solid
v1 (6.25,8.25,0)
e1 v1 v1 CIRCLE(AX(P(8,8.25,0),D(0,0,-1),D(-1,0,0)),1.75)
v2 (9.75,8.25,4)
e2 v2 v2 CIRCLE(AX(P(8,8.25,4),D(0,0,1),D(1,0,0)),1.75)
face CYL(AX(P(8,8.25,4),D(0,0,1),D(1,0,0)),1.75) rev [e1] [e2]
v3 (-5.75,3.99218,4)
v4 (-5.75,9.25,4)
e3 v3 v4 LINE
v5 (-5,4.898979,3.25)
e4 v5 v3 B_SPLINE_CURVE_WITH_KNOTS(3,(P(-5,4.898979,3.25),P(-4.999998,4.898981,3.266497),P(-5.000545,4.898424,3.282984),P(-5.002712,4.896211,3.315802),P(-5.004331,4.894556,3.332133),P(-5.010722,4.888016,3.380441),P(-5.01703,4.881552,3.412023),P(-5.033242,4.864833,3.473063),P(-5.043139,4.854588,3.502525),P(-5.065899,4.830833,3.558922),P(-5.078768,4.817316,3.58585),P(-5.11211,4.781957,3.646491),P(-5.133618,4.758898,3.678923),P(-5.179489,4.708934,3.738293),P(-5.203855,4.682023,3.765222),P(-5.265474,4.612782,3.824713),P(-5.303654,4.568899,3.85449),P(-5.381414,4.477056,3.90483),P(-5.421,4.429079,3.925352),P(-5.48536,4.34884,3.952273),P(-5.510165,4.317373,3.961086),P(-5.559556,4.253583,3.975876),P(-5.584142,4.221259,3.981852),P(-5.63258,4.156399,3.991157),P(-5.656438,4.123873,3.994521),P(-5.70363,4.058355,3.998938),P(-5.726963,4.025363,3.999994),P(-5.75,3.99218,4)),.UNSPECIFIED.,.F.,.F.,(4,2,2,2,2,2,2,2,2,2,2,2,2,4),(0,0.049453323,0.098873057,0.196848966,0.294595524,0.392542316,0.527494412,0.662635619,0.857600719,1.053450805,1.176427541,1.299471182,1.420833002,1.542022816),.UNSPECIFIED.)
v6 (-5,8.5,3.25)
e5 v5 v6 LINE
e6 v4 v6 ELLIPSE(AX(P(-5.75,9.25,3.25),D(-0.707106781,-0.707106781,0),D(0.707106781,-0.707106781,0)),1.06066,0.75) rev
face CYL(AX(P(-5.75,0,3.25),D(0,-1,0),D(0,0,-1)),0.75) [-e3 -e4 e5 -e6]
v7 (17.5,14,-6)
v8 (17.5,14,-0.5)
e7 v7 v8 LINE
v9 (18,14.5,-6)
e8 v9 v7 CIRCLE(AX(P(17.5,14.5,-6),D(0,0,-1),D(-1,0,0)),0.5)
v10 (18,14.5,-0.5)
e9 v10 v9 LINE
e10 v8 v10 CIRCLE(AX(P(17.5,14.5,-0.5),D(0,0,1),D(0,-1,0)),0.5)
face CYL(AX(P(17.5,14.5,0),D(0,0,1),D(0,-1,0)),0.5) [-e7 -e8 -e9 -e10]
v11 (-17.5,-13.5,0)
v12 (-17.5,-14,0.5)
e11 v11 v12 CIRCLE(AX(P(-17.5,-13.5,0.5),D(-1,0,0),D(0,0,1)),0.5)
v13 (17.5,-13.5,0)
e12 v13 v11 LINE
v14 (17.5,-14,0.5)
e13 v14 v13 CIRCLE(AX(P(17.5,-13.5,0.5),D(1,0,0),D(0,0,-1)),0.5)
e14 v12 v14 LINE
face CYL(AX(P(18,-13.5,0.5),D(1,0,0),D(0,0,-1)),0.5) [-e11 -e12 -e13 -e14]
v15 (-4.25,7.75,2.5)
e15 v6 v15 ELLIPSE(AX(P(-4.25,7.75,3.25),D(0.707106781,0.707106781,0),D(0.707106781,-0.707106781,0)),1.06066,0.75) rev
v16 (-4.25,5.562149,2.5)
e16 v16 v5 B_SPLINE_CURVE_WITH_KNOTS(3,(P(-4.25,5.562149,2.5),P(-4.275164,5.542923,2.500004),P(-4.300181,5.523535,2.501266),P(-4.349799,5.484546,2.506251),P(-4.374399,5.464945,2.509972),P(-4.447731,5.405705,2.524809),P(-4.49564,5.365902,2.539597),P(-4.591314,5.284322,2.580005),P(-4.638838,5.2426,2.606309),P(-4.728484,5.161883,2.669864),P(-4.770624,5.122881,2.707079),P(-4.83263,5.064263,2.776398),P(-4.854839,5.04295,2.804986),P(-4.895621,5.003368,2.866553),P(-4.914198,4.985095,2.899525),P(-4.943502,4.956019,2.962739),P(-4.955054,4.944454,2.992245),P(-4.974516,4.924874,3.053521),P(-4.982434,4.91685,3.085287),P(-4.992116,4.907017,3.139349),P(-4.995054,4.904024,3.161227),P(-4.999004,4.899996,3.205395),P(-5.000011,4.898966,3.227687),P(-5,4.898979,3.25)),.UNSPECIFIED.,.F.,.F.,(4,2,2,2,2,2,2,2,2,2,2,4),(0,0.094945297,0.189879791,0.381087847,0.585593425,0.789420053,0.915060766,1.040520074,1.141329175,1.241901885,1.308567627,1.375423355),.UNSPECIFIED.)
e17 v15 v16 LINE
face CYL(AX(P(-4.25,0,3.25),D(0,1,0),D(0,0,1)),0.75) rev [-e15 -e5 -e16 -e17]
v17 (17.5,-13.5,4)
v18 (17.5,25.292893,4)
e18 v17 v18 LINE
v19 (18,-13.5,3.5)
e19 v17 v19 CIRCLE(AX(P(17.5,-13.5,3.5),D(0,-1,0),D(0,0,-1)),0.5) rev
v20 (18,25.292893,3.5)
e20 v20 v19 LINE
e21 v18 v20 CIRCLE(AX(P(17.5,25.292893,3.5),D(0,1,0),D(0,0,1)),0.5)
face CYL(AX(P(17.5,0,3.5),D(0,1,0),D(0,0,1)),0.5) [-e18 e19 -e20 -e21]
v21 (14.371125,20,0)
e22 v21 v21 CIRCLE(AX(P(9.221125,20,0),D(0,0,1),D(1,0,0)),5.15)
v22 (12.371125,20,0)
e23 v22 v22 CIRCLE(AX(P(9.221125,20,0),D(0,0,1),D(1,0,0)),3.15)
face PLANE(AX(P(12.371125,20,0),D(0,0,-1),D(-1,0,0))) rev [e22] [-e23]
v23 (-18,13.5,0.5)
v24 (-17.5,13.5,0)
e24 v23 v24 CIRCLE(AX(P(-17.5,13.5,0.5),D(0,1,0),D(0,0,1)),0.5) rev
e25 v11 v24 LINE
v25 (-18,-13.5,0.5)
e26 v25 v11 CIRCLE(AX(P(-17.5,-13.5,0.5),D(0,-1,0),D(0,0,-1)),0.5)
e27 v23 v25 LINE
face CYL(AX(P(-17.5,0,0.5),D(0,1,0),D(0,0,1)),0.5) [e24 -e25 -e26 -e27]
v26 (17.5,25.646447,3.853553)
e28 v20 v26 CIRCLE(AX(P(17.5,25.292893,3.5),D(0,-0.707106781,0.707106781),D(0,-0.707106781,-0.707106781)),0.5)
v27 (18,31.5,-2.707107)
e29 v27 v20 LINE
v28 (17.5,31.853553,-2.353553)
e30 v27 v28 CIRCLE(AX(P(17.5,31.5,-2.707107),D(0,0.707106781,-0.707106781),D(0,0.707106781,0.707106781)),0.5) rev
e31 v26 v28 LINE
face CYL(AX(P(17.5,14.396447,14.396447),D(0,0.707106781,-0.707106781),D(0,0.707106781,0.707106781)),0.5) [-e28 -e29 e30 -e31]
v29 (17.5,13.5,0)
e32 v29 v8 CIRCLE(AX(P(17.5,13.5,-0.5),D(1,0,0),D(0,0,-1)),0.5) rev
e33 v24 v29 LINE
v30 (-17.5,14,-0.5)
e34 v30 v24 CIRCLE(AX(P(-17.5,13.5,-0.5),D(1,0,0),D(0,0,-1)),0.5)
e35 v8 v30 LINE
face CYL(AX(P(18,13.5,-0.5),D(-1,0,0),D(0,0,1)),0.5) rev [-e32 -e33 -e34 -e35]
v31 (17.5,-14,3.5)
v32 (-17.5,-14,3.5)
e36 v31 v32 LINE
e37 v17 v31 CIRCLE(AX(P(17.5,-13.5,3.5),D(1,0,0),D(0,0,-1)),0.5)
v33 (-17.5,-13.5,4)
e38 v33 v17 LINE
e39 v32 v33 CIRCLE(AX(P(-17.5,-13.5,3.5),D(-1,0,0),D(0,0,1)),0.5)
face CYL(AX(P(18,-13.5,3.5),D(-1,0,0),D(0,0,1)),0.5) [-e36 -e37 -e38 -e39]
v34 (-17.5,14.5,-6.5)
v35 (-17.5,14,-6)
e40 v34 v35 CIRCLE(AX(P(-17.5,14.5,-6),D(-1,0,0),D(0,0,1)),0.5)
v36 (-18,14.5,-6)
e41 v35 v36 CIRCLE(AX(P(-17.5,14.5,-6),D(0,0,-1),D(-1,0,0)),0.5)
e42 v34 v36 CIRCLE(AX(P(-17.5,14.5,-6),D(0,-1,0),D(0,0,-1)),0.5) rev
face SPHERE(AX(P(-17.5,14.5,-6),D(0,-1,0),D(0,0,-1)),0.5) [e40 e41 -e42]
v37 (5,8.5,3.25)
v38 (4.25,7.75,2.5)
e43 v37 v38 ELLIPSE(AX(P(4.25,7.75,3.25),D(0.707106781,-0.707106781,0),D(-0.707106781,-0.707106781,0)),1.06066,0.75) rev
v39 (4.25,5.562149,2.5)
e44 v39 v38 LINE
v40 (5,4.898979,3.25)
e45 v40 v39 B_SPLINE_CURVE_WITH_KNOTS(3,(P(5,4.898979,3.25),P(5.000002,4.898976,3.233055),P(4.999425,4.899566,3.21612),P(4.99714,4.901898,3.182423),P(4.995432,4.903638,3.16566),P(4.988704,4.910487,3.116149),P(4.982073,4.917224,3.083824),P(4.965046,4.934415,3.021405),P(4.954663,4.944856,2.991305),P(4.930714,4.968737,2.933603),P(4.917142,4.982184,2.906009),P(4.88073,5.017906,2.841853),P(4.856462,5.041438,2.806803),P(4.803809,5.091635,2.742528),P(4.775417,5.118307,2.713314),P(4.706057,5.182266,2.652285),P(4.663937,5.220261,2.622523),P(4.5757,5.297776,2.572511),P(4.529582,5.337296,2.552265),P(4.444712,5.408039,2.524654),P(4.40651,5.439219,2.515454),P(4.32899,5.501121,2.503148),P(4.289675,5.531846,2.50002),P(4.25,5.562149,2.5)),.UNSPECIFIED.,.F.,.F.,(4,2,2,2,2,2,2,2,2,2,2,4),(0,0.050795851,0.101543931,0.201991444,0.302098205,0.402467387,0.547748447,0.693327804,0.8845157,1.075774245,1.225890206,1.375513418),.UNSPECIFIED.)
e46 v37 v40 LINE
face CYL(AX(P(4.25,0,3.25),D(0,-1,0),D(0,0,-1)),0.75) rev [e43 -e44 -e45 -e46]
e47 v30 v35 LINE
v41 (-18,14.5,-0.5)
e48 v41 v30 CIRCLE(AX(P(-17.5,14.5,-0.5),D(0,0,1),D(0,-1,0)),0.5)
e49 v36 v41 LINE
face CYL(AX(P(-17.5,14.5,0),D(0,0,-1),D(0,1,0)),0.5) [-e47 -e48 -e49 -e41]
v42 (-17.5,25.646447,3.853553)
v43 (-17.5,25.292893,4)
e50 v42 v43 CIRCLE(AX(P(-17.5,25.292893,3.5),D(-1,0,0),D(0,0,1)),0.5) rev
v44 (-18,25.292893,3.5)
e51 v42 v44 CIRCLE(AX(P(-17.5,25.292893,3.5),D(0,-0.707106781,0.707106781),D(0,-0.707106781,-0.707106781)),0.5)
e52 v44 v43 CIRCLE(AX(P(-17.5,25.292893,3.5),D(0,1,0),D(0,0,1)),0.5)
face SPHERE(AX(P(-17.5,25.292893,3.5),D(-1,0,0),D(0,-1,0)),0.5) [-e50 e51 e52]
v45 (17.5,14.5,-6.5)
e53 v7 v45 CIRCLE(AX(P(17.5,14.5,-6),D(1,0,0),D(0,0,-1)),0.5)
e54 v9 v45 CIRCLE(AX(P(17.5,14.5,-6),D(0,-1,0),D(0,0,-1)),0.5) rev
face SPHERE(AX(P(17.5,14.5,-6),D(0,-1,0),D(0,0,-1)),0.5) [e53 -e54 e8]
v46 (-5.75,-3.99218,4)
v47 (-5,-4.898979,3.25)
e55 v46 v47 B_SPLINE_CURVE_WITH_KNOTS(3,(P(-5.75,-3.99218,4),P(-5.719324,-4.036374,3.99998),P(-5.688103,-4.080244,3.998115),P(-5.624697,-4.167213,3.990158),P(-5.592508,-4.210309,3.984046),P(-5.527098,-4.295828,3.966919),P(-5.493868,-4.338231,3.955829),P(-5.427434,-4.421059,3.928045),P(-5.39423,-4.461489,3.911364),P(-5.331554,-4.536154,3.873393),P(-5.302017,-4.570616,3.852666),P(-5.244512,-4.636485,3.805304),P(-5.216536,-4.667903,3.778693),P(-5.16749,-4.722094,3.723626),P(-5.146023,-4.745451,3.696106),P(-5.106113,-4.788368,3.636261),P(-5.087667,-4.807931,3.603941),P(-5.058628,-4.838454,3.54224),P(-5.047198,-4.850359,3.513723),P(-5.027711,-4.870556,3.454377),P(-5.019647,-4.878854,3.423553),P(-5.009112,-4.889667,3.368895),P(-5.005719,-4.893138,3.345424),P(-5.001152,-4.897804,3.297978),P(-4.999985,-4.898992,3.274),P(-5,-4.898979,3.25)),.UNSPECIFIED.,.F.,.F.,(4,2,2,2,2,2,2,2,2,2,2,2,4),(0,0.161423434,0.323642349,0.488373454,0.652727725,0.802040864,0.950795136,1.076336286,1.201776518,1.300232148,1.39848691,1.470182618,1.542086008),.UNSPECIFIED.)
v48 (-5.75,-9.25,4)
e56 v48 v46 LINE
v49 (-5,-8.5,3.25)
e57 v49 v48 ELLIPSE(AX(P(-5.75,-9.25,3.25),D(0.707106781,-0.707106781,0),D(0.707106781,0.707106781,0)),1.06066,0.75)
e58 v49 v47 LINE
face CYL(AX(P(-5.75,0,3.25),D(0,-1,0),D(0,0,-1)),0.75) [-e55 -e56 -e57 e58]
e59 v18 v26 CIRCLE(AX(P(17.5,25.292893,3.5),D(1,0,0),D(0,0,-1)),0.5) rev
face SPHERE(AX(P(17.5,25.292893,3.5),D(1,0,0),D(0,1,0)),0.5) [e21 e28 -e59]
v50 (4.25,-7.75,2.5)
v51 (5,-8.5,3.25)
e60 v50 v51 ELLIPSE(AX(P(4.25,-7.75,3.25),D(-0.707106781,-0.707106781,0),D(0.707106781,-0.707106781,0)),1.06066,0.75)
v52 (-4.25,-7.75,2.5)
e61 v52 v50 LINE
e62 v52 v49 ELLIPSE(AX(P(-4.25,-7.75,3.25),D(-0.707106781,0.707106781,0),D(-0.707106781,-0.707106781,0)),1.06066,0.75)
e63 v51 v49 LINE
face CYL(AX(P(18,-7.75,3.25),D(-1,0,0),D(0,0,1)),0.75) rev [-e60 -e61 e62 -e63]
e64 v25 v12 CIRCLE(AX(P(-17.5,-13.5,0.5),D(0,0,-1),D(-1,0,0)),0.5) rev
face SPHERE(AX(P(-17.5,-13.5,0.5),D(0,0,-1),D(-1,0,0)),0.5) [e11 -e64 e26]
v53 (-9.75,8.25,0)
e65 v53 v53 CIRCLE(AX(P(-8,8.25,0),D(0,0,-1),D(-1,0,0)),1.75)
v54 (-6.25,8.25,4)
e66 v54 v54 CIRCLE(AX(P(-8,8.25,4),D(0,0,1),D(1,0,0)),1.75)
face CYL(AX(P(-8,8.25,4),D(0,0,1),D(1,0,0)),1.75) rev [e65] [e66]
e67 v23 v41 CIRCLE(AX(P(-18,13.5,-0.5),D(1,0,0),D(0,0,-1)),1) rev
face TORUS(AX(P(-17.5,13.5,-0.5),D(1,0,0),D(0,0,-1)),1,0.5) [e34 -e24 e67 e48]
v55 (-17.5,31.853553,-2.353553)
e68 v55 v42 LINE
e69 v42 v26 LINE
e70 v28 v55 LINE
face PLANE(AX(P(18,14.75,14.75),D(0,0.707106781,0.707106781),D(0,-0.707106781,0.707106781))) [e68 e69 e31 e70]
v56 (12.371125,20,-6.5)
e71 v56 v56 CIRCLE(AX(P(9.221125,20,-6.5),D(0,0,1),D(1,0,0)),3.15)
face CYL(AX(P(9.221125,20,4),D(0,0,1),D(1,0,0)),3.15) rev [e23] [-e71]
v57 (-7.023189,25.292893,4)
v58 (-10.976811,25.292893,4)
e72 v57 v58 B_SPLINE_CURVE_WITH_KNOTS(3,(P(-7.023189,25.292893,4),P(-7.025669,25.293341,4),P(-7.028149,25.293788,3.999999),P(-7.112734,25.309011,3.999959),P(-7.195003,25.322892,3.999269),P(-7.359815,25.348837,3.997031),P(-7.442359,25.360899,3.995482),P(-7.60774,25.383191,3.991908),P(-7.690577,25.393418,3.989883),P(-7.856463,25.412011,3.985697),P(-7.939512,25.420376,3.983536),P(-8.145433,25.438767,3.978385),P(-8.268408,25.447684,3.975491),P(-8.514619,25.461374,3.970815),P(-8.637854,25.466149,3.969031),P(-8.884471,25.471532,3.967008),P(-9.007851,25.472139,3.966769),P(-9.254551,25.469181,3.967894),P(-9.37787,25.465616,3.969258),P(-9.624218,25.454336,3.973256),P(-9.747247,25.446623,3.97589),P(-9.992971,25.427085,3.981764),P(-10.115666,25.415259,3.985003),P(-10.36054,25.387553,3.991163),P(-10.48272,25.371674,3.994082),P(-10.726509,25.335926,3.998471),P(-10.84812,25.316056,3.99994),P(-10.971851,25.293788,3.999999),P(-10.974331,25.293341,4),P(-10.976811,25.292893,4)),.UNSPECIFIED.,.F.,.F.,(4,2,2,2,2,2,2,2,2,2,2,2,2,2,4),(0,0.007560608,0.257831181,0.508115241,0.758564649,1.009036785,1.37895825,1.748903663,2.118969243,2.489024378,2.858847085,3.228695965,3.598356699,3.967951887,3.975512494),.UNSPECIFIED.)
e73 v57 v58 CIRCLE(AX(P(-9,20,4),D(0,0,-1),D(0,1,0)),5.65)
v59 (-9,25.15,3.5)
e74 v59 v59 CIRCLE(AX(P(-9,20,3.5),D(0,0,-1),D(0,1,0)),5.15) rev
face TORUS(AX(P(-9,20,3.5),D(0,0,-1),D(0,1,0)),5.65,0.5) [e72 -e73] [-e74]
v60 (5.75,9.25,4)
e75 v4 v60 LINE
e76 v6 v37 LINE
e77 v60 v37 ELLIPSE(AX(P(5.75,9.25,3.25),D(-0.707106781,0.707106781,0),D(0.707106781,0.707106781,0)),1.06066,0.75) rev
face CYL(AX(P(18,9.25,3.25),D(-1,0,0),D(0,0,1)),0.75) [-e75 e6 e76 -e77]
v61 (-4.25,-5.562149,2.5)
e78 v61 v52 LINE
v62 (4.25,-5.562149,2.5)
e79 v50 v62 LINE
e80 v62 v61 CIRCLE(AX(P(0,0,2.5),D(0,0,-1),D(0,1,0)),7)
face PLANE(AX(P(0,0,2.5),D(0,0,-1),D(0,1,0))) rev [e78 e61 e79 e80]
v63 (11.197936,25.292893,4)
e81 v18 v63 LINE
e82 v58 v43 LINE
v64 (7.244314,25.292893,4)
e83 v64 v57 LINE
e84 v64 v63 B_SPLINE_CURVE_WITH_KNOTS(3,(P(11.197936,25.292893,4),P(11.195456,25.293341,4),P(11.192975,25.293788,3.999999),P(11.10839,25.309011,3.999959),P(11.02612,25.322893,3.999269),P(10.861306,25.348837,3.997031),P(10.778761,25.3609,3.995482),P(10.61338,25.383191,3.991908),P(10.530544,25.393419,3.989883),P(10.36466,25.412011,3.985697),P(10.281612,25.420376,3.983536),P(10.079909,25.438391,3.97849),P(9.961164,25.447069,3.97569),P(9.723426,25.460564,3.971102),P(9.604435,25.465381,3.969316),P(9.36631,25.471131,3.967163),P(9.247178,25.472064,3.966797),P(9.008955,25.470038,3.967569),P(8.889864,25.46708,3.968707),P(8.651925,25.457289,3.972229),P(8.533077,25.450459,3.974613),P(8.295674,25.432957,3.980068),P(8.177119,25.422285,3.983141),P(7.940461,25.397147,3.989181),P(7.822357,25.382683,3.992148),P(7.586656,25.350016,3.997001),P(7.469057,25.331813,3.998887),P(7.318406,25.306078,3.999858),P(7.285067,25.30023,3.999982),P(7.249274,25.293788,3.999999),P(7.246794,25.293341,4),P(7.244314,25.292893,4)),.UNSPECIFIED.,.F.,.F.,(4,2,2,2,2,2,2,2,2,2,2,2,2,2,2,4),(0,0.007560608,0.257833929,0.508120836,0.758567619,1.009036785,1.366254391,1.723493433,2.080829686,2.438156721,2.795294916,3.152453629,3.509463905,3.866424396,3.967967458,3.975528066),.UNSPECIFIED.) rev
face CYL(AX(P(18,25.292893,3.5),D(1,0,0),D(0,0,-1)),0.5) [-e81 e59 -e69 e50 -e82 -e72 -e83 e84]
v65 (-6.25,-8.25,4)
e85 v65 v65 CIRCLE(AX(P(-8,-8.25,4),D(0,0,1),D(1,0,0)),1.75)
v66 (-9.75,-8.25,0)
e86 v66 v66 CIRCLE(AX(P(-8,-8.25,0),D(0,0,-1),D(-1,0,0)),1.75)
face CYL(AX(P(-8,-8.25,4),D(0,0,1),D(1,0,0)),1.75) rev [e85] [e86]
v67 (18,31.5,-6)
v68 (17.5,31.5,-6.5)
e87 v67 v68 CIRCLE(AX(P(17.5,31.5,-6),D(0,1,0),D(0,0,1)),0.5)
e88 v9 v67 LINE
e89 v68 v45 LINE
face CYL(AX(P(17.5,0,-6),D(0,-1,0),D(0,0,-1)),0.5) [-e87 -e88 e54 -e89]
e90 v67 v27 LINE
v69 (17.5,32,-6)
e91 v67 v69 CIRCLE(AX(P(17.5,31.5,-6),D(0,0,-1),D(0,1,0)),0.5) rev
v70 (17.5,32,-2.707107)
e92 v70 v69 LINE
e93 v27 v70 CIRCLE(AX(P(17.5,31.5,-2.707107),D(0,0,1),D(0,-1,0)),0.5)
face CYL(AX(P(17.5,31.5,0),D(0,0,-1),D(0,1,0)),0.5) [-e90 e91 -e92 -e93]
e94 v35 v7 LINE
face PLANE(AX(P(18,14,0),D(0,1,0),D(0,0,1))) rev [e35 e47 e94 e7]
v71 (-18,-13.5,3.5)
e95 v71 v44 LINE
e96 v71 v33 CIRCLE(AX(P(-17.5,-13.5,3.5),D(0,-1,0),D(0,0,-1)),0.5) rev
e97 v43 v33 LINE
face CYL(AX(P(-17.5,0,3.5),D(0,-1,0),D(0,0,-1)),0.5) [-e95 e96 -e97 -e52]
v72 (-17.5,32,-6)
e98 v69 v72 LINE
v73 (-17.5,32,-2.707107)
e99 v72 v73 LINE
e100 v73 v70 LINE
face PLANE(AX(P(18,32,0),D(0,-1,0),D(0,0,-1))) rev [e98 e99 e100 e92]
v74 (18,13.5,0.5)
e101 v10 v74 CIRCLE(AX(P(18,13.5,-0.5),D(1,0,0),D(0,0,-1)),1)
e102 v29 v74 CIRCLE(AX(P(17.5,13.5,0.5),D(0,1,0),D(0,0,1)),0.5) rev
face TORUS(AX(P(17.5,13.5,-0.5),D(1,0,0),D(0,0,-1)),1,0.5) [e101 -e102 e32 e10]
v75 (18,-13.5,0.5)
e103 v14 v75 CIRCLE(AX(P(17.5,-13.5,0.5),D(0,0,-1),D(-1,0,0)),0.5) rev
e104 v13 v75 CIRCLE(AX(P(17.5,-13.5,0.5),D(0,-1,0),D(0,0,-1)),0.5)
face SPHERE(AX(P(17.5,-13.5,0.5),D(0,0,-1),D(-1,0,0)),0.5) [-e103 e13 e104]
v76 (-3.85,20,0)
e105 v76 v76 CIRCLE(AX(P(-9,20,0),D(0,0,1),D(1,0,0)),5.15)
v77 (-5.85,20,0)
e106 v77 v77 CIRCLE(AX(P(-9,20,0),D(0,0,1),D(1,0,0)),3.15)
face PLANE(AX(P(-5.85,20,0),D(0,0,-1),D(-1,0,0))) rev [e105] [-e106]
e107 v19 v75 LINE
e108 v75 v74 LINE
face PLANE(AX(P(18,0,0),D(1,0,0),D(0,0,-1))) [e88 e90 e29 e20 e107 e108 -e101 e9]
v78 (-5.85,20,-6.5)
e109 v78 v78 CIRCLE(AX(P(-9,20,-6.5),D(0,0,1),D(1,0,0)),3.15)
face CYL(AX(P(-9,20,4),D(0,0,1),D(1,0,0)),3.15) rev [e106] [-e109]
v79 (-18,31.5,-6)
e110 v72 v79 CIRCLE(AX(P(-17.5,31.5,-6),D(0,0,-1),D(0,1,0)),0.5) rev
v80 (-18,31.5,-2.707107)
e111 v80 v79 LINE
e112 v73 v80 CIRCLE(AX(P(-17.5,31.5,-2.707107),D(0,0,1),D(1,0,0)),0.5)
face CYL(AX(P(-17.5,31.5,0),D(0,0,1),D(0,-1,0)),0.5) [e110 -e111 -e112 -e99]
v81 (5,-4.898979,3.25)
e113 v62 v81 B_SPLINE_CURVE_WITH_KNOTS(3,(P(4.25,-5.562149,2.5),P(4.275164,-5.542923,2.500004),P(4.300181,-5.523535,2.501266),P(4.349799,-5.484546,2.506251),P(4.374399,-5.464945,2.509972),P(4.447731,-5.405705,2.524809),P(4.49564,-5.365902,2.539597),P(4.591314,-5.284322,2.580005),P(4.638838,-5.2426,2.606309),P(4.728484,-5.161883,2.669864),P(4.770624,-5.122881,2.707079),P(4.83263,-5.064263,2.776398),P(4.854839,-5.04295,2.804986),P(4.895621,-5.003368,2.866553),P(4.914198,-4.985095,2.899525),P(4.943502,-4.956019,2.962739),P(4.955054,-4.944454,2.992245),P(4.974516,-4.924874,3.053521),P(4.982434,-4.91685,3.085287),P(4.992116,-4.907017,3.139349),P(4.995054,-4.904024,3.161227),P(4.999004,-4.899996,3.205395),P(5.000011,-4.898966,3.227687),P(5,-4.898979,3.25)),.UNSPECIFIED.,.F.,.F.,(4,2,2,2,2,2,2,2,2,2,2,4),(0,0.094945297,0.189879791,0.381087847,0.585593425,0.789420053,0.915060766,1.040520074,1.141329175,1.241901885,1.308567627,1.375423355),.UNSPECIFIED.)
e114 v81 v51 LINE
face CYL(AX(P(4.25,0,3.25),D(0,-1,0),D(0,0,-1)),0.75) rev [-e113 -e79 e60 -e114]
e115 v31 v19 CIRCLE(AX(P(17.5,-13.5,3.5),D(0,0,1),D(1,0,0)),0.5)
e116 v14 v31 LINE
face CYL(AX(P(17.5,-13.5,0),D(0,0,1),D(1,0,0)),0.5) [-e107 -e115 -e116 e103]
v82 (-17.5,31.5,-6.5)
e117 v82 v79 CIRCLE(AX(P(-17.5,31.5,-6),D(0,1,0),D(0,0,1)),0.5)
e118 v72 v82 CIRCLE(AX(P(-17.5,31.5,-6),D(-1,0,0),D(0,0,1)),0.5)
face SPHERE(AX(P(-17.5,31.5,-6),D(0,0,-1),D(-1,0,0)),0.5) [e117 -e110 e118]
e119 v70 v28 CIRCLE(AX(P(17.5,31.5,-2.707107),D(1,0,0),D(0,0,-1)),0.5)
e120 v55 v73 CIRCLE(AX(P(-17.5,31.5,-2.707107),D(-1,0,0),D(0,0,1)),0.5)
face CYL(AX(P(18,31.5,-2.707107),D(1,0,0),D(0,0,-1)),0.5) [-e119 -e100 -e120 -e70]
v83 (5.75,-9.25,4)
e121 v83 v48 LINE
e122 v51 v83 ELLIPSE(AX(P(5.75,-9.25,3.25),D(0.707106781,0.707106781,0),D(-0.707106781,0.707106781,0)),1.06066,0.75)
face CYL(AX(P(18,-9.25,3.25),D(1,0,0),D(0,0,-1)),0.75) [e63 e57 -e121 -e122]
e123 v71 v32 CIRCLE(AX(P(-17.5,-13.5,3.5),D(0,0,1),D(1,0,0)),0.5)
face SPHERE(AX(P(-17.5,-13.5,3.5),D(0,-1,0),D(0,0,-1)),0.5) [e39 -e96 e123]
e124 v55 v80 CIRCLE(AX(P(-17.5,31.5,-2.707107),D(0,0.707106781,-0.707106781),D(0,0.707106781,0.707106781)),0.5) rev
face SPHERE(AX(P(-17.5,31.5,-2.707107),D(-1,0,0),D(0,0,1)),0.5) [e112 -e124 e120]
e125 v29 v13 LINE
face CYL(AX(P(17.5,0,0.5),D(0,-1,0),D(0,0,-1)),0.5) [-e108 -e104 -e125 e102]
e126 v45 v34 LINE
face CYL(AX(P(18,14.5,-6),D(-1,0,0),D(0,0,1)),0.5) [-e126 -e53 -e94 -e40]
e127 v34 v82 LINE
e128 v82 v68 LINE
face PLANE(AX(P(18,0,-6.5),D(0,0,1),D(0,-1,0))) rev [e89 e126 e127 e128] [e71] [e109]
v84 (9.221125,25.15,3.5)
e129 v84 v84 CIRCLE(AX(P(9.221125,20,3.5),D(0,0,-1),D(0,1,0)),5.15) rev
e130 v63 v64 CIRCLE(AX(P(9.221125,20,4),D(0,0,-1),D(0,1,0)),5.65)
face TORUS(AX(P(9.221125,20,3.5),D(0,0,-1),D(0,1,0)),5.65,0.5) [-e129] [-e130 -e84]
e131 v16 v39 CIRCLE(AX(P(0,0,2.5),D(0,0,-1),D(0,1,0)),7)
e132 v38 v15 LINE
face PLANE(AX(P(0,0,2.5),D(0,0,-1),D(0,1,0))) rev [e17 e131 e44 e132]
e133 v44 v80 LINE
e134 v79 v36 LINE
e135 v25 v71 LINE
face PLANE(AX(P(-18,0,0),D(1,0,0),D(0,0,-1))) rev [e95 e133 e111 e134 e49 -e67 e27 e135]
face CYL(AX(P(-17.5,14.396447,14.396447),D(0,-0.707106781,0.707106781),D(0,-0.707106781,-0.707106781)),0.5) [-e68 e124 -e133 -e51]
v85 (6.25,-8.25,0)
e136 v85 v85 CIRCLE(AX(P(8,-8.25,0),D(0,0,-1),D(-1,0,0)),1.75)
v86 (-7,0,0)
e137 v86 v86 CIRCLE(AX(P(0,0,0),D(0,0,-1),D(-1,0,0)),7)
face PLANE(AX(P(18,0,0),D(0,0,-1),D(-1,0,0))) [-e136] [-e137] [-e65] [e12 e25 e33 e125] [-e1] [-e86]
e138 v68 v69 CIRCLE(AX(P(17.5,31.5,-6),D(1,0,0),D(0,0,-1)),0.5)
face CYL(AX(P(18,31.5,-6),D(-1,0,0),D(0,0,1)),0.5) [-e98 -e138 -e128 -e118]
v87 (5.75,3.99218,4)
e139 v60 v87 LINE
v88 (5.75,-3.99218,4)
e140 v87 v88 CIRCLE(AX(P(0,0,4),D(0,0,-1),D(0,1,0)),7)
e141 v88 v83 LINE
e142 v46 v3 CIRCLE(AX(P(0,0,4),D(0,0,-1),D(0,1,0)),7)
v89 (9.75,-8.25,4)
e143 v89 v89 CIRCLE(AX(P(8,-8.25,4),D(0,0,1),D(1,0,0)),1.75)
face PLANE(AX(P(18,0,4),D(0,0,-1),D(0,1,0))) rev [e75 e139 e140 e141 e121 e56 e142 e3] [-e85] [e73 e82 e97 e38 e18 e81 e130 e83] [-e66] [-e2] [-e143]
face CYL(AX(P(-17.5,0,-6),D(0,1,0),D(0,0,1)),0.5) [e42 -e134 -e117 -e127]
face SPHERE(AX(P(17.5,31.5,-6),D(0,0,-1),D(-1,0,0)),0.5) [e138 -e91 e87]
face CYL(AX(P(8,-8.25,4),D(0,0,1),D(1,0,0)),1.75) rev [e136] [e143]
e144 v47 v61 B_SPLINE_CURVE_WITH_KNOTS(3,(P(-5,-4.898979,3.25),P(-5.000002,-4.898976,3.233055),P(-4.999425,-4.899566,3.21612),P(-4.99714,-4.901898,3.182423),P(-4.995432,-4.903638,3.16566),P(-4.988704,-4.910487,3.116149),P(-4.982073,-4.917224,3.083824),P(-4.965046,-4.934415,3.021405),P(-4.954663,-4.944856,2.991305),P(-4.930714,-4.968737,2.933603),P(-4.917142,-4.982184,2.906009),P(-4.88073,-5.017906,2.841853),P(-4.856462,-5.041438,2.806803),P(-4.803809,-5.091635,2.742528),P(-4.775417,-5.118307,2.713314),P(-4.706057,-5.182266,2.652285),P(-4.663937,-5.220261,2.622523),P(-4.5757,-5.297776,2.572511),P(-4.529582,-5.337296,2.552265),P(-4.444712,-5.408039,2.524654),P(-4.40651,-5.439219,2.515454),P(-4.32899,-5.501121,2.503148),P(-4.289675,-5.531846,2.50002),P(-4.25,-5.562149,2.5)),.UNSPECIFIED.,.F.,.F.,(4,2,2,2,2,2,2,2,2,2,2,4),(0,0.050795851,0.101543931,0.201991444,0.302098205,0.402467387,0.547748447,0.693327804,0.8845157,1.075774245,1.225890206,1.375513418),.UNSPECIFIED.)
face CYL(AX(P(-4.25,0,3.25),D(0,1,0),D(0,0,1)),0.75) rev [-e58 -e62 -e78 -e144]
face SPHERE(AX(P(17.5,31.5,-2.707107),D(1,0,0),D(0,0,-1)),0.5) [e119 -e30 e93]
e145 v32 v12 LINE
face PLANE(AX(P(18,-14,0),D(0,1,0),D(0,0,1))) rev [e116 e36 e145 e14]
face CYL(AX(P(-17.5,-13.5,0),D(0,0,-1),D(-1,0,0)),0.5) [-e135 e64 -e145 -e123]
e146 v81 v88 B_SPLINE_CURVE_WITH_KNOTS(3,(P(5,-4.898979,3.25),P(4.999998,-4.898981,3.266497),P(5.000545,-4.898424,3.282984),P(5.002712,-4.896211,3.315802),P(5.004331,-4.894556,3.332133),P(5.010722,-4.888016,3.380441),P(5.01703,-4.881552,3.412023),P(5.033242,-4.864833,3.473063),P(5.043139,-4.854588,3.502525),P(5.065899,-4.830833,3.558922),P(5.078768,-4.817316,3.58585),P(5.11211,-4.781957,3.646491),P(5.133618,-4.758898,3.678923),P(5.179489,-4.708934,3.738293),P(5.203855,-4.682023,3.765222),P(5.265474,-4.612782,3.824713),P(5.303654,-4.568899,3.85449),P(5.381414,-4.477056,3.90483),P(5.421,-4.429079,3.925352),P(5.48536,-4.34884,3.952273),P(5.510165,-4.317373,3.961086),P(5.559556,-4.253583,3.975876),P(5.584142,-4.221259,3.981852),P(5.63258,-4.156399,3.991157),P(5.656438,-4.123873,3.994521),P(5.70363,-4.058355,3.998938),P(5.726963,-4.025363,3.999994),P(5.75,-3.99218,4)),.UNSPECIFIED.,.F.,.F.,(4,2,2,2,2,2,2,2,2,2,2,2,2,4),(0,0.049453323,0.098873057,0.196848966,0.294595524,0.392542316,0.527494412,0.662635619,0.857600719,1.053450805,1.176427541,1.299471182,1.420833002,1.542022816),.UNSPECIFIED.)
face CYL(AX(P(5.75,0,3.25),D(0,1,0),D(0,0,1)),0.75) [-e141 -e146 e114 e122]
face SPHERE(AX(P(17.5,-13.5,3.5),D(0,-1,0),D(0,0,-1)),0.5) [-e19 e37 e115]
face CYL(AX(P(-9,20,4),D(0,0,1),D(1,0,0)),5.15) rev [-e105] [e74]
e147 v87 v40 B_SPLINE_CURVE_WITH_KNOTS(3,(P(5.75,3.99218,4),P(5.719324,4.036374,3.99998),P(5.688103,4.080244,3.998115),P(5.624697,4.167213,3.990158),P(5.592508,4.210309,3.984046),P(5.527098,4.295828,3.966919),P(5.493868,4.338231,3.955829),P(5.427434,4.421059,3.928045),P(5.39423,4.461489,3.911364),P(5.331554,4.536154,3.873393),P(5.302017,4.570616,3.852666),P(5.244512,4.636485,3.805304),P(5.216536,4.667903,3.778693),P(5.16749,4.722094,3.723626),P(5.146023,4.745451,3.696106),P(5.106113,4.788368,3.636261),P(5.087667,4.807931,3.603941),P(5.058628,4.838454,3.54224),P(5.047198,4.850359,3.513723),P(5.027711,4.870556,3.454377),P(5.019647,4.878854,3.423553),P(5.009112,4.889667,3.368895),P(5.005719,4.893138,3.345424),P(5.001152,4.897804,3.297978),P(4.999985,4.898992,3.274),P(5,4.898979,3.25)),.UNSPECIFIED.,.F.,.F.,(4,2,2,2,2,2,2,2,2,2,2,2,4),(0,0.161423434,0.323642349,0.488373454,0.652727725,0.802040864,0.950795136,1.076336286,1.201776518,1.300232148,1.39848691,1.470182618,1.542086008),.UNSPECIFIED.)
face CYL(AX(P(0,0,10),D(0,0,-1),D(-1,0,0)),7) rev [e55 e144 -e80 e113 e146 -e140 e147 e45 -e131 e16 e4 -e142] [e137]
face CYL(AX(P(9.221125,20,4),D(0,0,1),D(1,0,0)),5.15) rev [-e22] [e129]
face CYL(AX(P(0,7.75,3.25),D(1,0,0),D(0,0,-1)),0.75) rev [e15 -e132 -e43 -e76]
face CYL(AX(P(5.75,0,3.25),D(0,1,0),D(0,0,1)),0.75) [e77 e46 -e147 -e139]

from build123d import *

# Parameters (mm, degrees)
BOSS_EXTRUDE1_DEPTH                     = 18
SKETCH6_R                               = 7
CUT_EXTRUDE1_DEPTH                      = 10
CUT_EXTRUDE2_START                      = -2.5
CUT_EXTRUDE2_DEPTH                      = 1.5
F_4_0MM_DOWEL_HOLE1_D                   = 3.5
CBORE_FOR_M5_HEX_HEAD_BOLT1_D           = 6.3
CBORE_FOR_M5_HEX_HEAD_BOLT1_CBORE_D     = 10.3
CBORE_FOR_M5_HEX_HEAD_BOLT1_CBORE_DEPTH = 4
FILLET1_R                               = 0.5
FILLET3_R                               = 0.75


# Some blends are built 0.0001 mm under size
with BuildPart() as part:
    # Sketch5 → Boss-Extrude1 (new, symmetric)
    with BuildSketch(Plane(origin=(0, 0, 0), x_dir=(0, 0, -1), z_dir=(1, 0, 0))):
        Polygon((0, 14), (0, -14), (-4, -14), (-4, 25.5), (2.5, 32), (6.5, 32), (6.5, 14), align=None)
    extrude(amount=BOSS_EXTRUDE1_DEPTH, both=True)

    # Sketch6 → Cut-Extrude1 (cut)
    with BuildSketch(Plane(origin=(0, 0, 0), x_dir=(-1, 0, 0), z_dir=(0, 0, -1))):
        Circle(SKETCH6_R)
    extrude(amount=-CUT_EXTRUDE1_DEPTH, mode=Mode.SUBTRACT)

    # Sketch6<4> → Cut-Extrude2 (cut)
    with BuildSketch(Plane(origin=(0, 0, 0), x_dir=(-1, 0, 0), z_dir=(0, 0, -1)).offset(CUT_EXTRUDE2_START)):
        with BuildLine():
            Line((-5, 8.5), (-5, 4.898979486))
            ThreePointArc((-5, 4.898979486), (0, 7), (5, 4.898979486))
            Line((5, 4.898979486), (5, 8.5))
            Line((5, 8.5), (-5, 8.5))
        make_face()
        with BuildLine():
            Line((-5, -4.898979486), (-5, -8.5))
            Line((-5, -8.5), (5, -8.5))
            Line((5, -8.5), (5, -4.898979486))
            ThreePointArc((5, -4.898979486), (0, -7), (-5, -4.898979486))
        make_face()
    extrude(amount=-CUT_EXTRUDE2_DEPTH, mode=Mode.SUBTRACT)

    # Ø4.0mm Dowel Hole1 (through all)
    with Locations(Plane.XY.offset(4)):
        with Locations((8, 8.25), (8, -8.25), (-8, -8.25), (-8, 8.25)):
            Hole(F_4_0MM_DOWEL_HOLE1_D / 2)

    # CBORE for M5 Hex Head Bolt1 (through all)
    with Locations(Plane.XY.offset(4)):
        with Locations((9.221124847, 20), (-9, 20)):
            CounterBoreHole(CBORE_FOR_M5_HEX_HEAD_BOLT1_D / 2, CBORE_FOR_M5_HEX_HEAD_BOLT1_CBORE_D / 2, CBORE_FOR_M5_HEX_HEAD_BOLT1_CBORE_DEPTH)

    # Fillet1
    # the kernel refuses this fillet: 0.5 mm, written as the material it adds along each edge
    with BuildSketch(Plane(origin=(-18, 14, 0), x_dir=(0, -1, 0), z_dir=(1, 0, 0))) as fillet1_piece_1:
        with BuildLine():
            CenterArc((FILLET1_R, FILLET1_R), FILLET1_R, 180, 90)
            Line((0, FILLET1_R), (0, 0))
            Line((0, 0), (FILLET1_R, 0))
        make_face()
    extrude(amount=36)
    # the kernel refuses this fillet: 0.5 mm, written as the material it takes off along each edge
    with BuildSketch(Plane(origin=(-17.5, -13.5, 3.5), x_dir=(0, -1, 0), z_dir=(0, 0, 1))) as fillet1_2_piece_1_section:
        Polygon((0, 0), (FILLET1_R, 0), (FILLET1_R, -FILLET1_R), (0, -FILLET1_R), align=None)
    fillet1_2_piece_1 = extrude(amount=FILLET1_R, mode=Mode.PRIVATE)
    fillet1_2_piece_1 = fillet1_2_piece_1 - Plane(origin=(-17.5, -13.5, 3.5), x_dir=(0.7071067811865475, 0.7071067811865475, 0), z_dir=(0, 0, 1)) * Sphere(FILLET1_R, mode=Mode.PRIVATE)
    add(fillet1_2_piece_1, mode=Mode.SUBTRACT)
    with BuildSketch(Plane(origin=(17.5, -13.5, 3.5), x_dir=(1, 0, 0), z_dir=(0, -1, 0))) as fillet1_2_piece_2_section:
        Polygon((0, 0), (FILLET1_R, 0), (FILLET1_R, FILLET1_R), (0, FILLET1_R), align=None)
    fillet1_2_piece_2 = extrude(amount=FILLET1_R, mode=Mode.PRIVATE)
    fillet1_2_piece_2 = fillet1_2_piece_2 - Plane(origin=(17.5, -13.5, 3.5), x_dir=(-0.7071067811865475, 0, -0.7071067811865475), z_dir=(0, -1, 0)) * Sphere(FILLET1_R, mode=Mode.PRIVATE)
    add(fillet1_2_piece_2, mode=Mode.SUBTRACT)
    with BuildSketch(Plane(origin=(17.5, 25.292893219, 3.5), x_dir=(0, 0, 1), z_dir=(1, 0, 0))) as fillet1_2_piece_3_section:
        Polygon((0, 0), (FILLET1_R, 0), (FILLET1_R, -FILLET1_R * 0.414213562373), (FILLET1_R * 0.707106781187, -FILLET1_R * 0.707106781187), align=None)
    fillet1_2_piece_3 = extrude(amount=FILLET1_R, mode=Mode.PRIVATE)
    fillet1_2_piece_3 = fillet1_2_piece_3 - Plane(origin=(17.5, 25.292893219, 3.5), x_dir=(0, -0.38268343236509034, -0.9238795325112865), z_dir=(1, 0, 0)) * Sphere(FILLET1_R, mode=Mode.PRIVATE)
    add(fillet1_2_piece_3, mode=Mode.SUBTRACT)
    with BuildSketch(Plane(origin=(-17.5, 25.292893219, 3.5), x_dir=(0, 0.7071067811865485, 0.7071067811865466), z_dir=(-1, 0, 0))) as fillet1_2_piece_4_section:
        Polygon((0, 0), (FILLET1_R, 0), (FILLET1_R, -FILLET1_R * 0.414213562373), (FILLET1_R * 0.707106781187, -FILLET1_R * 0.707106781187), align=None)
    fillet1_2_piece_4 = extrude(amount=FILLET1_R, mode=Mode.PRIVATE)
    fillet1_2_piece_4 = fillet1_2_piece_4 - Plane(origin=(-17.5, 25.292893219, 3.5), x_dir=(0, -0.38268343236509034, -0.9238795325112865), z_dir=(-1, 0, 0)) * Sphere(FILLET1_R, mode=Mode.PRIVATE)
    add(fillet1_2_piece_4, mode=Mode.SUBTRACT)
    with BuildSketch(Plane(origin=(-17.5, 31.5, -2.707106781), x_dir=(0, 0.7071067811865485, 0.7071067811865466), z_dir=(-1, 0, 0))) as fillet1_2_piece_5_section:
        Polygon((0, 0), (FILLET1_R, 0), (FILLET1_R, FILLET1_R * 0.414213562373), (FILLET1_R * 0.707106781187, FILLET1_R * 0.707106781187), align=None)
    fillet1_2_piece_5 = extrude(amount=FILLET1_R, mode=Mode.PRIVATE)
    fillet1_2_piece_5 = fillet1_2_piece_5 - Plane(origin=(-17.5, 31.5, -2.707106781), x_dir=(0, -0.9238795325112866, -0.38268343236509), z_dir=(-1, 0, 0)) * Sphere(FILLET1_R, mode=Mode.PRIVATE)
    add(fillet1_2_piece_5, mode=Mode.SUBTRACT)
    with BuildSketch(Plane(origin=(17.5, 31.5, -2.707106781), x_dir=(0, 0.7071067811865485, 0.7071067811865466), z_dir=(1, 0, 0))) as fillet1_2_piece_6_section:
        Polygon((0, 0), (FILLET1_R, 0), (FILLET1_R, -FILLET1_R * 0.414213562373), (FILLET1_R * 0.707106781187, -FILLET1_R * 0.707106781187), align=None)
    fillet1_2_piece_6 = extrude(amount=FILLET1_R, mode=Mode.PRIVATE)
    fillet1_2_piece_6 = fillet1_2_piece_6 - Plane(origin=(17.5, 31.5, -2.707106781), x_dir=(0, -0.9238795325112866, -0.38268343236509), z_dir=(1, 0, 0)) * Sphere(FILLET1_R, mode=Mode.PRIVATE)
    add(fillet1_2_piece_6, mode=Mode.SUBTRACT)
    with BuildSketch(Plane(origin=(-17.5, 31.5, -6), x_dir=(0, 1, 0), z_dir=(-1, 0, 0))) as fillet1_2_piece_7_section:
        Polygon((0, 0), (FILLET1_R, 0), (FILLET1_R, FILLET1_R), (0, FILLET1_R), align=None)
    fillet1_2_piece_7 = extrude(amount=FILLET1_R, mode=Mode.PRIVATE)
    fillet1_2_piece_7 = fillet1_2_piece_7 - Plane(origin=(-17.5, 31.5, -6), x_dir=(0, -0.707106781186548, 0.7071067811865471), z_dir=(-1, 0, 0)) * Sphere(FILLET1_R, mode=Mode.PRIVATE)
    add(fillet1_2_piece_7, mode=Mode.SUBTRACT)
    with BuildSketch(Plane(origin=(17.5, 31.5, -6), x_dir=(0, 1, 0), z_dir=(1, 0, 0))) as fillet1_2_piece_8_section:
        Polygon((0, 0), (FILLET1_R, 0), (FILLET1_R, -FILLET1_R), (0, -FILLET1_R), align=None)
    fillet1_2_piece_8 = extrude(amount=FILLET1_R, mode=Mode.PRIVATE)
    fillet1_2_piece_8 = fillet1_2_piece_8 - Plane(origin=(17.5, 31.5, -6), x_dir=(0, -0.707106781186548, 0.7071067811865471), z_dir=(1, 0, 0)) * Sphere(FILLET1_R, mode=Mode.PRIVATE)
    add(fillet1_2_piece_8, mode=Mode.SUBTRACT)
    with BuildSketch(Plane(origin=(-18, -14, -1.25), x_dir=(1, 0, 0), z_dir=(0, 0, 1)), Plane(origin=(18, -14, -1.25), x_dir=(0, 1, 0), z_dir=(0, 0, 1))) as fillet1_2_piece_9:
        with BuildLine():
            CenterArc((FILLET1_R, FILLET1_R), FILLET1_R, 180, 90)
            Line((0, FILLET1_R), (0, 0))
            Line((0, 0), (FILLET1_R, 0))
        make_face()
    extrude(amount=4.75, mode=Mode.SUBTRACT)
    with BuildSketch(Plane(origin=(18, -13.5, 4), x_dir=(0, 0, -1), z_dir=(0, 1, 0))) as fillet1_2_piece_10:
        with BuildLine():
            CenterArc((FILLET1_R, FILLET1_R), FILLET1_R, 180, 90)
            Line((0, FILLET1_R), (0, 0))
            Line((0, 0), (FILLET1_R, 0))
        make_face()
    extrude(amount=38.792893219, mode=Mode.SUBTRACT)
    with BuildSketch(Plane(origin=(-18, -13.5, 4), x_dir=(0, 0, -1), z_dir=(0, 1, 0))) as fillet1_2_piece_11:
        with BuildLine():
            CenterArc((FILLET1_R, -FILLET1_R), FILLET1_R, 90, 90)
            Line((0, -FILLET1_R), (0, 0))
            Line((0, 0), (FILLET1_R, 0))
        make_face()
    extrude(amount=38.792893219, mode=Mode.SUBTRACT)
    with BuildSketch(Plane(origin=(-18, 25.646446609, 3.853553391), x_dir=(0, -0.7071067811865486, -0.7071067811865466), z_dir=(0, 0.7071067811865466, -0.7071067811865485))) as fillet1_2_piece_12:
        with BuildLine():
            CenterArc((FILLET1_R, -FILLET1_R), FILLET1_R, 90, 90)
            Line((0, -FILLET1_R), (0, 0))
            Line((0, 0), (FILLET1_R, 0))
        make_face()
    extrude(amount=8.778174593, mode=Mode.SUBTRACT)
    with BuildSketch(Plane(origin=(17.5, 32, -2.5), x_dir=(0, -0.7071067811865421, 0.7071067811865528), z_dir=(-1, 0, 0)), Plane(origin=(17.5, 25.5, 4), x_dir=(0, -1, 0), z_dir=(-1, 0, 0))) as fillet1_2_piece_13:
        with BuildLine():
            CenterArc((FILLET1_R * 0.414213562373, -FILLET1_R), FILLET1_R, 90, 45)
            Line((-FILLET1_R * 0.292893218813, -FILLET1_R * 0.292893218813), (0, 0))
            Line((0, 0), (FILLET1_R * 0.414213562373, 0))
        make_face()
    extrude(amount=35, mode=Mode.SUBTRACT)
    with BuildSketch(Plane(origin=(-17.5, 32, -6.5), x_dir=(0, 0, 1), z_dir=(1, 0, 0))) as fillet1_2_piece_14:
        with BuildLine():
            CenterArc((FILLET1_R, FILLET1_R), FILLET1_R, 180, 90)
            Line((0, FILLET1_R), (0, 0))
            Line((0, 0), (FILLET1_R, 0))
        make_face()
    extrude(amount=35, mode=Mode.SUBTRACT)
    with BuildSketch(Plane(origin=(-19.25, 14, -6.5), x_dir=(0, 0, 1), z_dir=(1, 0, 0)), Plane(origin=(19.25, -14, 0), x_dir=(0, 1, 0), z_dir=(-1, 0, 0))) as fillet1_2_piece_15:
        with BuildLine():
            CenterArc((FILLET1_R, -FILLET1_R), FILLET1_R, 90, 90)
            Line((0, -FILLET1_R), (0, 0))
            Line((0, 0), (FILLET1_R, 0))
        make_face()
    extrude(amount=38.5, mode=Mode.SUBTRACT)
    with BuildSketch(Plane(origin=(17.5, -14, 4), x_dir=(0, 0, -1), z_dir=(-1, 0, 0))) as fillet1_2_piece_16:
        with BuildLine():
            CenterArc((FILLET1_R, -FILLET1_R), FILLET1_R, 90, 90)
            Line((0, -FILLET1_R), (0, 0))
            Line((0, 0), (FILLET1_R, 0))
        make_face()
    extrude(amount=35, mode=Mode.SUBTRACT)
    with BuildSketch(Plane(origin=(18, 31.5, -6.5), x_dir=(0, 0, 1), z_dir=(0, -1, 0))) as fillet1_2_piece_17:
        with BuildLine():
            CenterArc((FILLET1_R, FILLET1_R), FILLET1_R, 180, 90)
            Line((0, FILLET1_R), (0, 0))
            Line((0, 0), (FILLET1_R, 0))
        make_face()
    extrude(amount=18.75, mode=Mode.SUBTRACT)
    with BuildSketch(Plane(origin=(18, 32, -2.707106781), x_dir=(0, -1, 0), z_dir=(0, 0, -1))) as fillet1_2_piece_18:
        with BuildLine():
            CenterArc((FILLET1_R, FILLET1_R), FILLET1_R, 180, 90)
            Line((0, FILLET1_R), (0, 0))
            Line((0, 0), (FILLET1_R, 0))
        make_face()
    extrude(amount=3.292893219, mode=Mode.SUBTRACT)
    with BuildSketch(Plane(origin=(18, 25.646446609, 3.853553391), x_dir=(0, -0.7071067811865486, -0.7071067811865466), z_dir=(0, 0.7071067811865466, -0.7071067811865485))) as fillet1_2_piece_19:
        with BuildLine():
            CenterArc((FILLET1_R, FILLET1_R), FILLET1_R, 180, 90)
            Line((0, FILLET1_R), (0, 0))
            Line((0, 0), (FILLET1_R, 0))
        make_face()
    extrude(amount=8.778174593, mode=Mode.SUBTRACT)
    with BuildSketch(Plane(origin=(-18, 32, -2.707106781), x_dir=(0, -1, 0), z_dir=(0, 0, -1))) as fillet1_2_piece_20:
        with BuildLine():
            CenterArc((FILLET1_R, -FILLET1_R), FILLET1_R, 90, 90)
            Line((0, -FILLET1_R), (0, 0))
            Line((0, 0), (FILLET1_R, 0))
        make_face()
    extrude(amount=3.292893219, mode=Mode.SUBTRACT)
    with BuildSketch(Plane(origin=(9.221124847, 20, 4), x_dir=(1, 0, 0), z_dir=(0, -1, 0))) as fillet1_2_piece_21:
        with BuildLine():
            CenterArc((5.15 + FILLET1_R, -FILLET1_R), FILLET1_R, 90, 90)
            Line((5.15, -FILLET1_R), (5.15, 0))
            Line((5.15, 0), (5.15 + FILLET1_R, 0))
        make_face()
    revolve(axis=Axis((9.221124847, 20, 4), (0, 0, 1)), mode=Mode.SUBTRACT)
    with BuildSketch(Plane(origin=(-18, 31.5, -6.5), x_dir=(0, 0, 1), z_dir=(0, -1, 0))) as fillet1_2_piece_22:
        with BuildLine():
            CenterArc((FILLET1_R, -FILLET1_R), FILLET1_R, 90, 90)
            Line((0, -FILLET1_R), (0, 0))
            Line((0, 0), (FILLET1_R, 0))
        make_face()
    extrude(amount=18.75, mode=Mode.SUBTRACT)
    with BuildSketch(Plane(origin=(-9, 20, 4), x_dir=(1, 0, 0), z_dir=(0, -1, 0))) as fillet1_2_piece_23:
        with BuildLine():
            CenterArc((5.15 + FILLET1_R, -FILLET1_R), FILLET1_R, 90, 90)
            Line((5.15, -FILLET1_R), (5.15, 0))
            Line((5.15, 0), (5.15 + FILLET1_R, 0))
        make_face()
    revolve(axis=Axis((-9, 20, 4), (0, 0, 1)), mode=Mode.SUBTRACT)
    # the kernel refuses this fillet: 0.5 mm, written as the material it takes off along each edge
    with BuildSketch(Plane(origin=(-17.5, 14.5, -6), x_dir=(0, -1, 0), z_dir=(-1, 0, 0))) as fillet1_3_piece_1_section:
        Polygon((0, 0), (FILLET1_R, 0), (FILLET1_R, -FILLET1_R), (0, -FILLET1_R), align=None)
    fillet1_3_piece_1 = extrude(amount=FILLET1_R, mode=Mode.PRIVATE)
    fillet1_3_piece_1 = fillet1_3_piece_1 - Plane(origin=(-17.5, 14.5, -6), x_dir=(0, 0.7071067811865476, 0.7071067811865476), z_dir=(-1, 0, 0)) * Sphere(FILLET1_R, mode=Mode.PRIVATE)
    add(fillet1_3_piece_1, mode=Mode.SUBTRACT)
    with BuildSketch(Plane(origin=(17.5, 14.5, -6), x_dir=(0, -1, 0), z_dir=(1, 0, 0))) as fillet1_3_piece_2_section:
        Polygon((0, 0), (FILLET1_R, 0), (FILLET1_R, FILLET1_R), (0, FILLET1_R), align=None)
    fillet1_3_piece_2 = extrude(amount=FILLET1_R, mode=Mode.PRIVATE)
    fillet1_3_piece_2 = fillet1_3_piece_2 - Plane(origin=(17.5, 14.5, -6), x_dir=(0, 0.7071067811865476, 0.7071067811865476), z_dir=(1, 0, 0)) * Sphere(FILLET1_R, mode=Mode.PRIVATE)
    add(fillet1_3_piece_2, mode=Mode.SUBTRACT)
    with BuildSketch(Plane(origin=(17.5, -13.5, 0.5), x_dir=(1, 0, 0), z_dir=(0, 0, -1))) as fillet1_3_piece_3_section:
        Polygon((0, 0), (FILLET1_R, 0), (FILLET1_R, FILLET1_R), (0, FILLET1_R), align=None)
    fillet1_3_piece_3 = extrude(amount=FILLET1_R, mode=Mode.PRIVATE)
    fillet1_3_piece_3 = fillet1_3_piece_3 - Plane(origin=(17.5, -13.5, 0.5), x_dir=(-0.7071067811865475, 0.7071067811865475, 0), z_dir=(0, 0, -1)) * Sphere(FILLET1_R, mode=Mode.PRIVATE)
    add(fillet1_3_piece_3, mode=Mode.SUBTRACT)
    with BuildSketch(Plane(origin=(-17.5, -13.5, 0.5), x_dir=(-1, 0, 0), z_dir=(0, 0, -1))) as fillet1_3_piece_4_section:
        Polygon((0, 0), (FILLET1_R, 0), (FILLET1_R, -FILLET1_R), (0, -FILLET1_R), align=None)
    fillet1_3_piece_4 = extrude(amount=FILLET1_R, mode=Mode.PRIVATE)
    fillet1_3_piece_4 = fillet1_3_piece_4 - Plane(origin=(-17.5, -13.5, 0.5), x_dir=(0.7071067811865475, 0.7071067811865475, 0), z_dir=(0, 0, -1)) * Sphere(FILLET1_R, mode=Mode.PRIVATE)
    add(fillet1_3_piece_4, mode=Mode.SUBTRACT)
    with BuildSketch(Plane(origin=(-18, 13.5, 0), x_dir=(1, 0, 0), z_dir=(0, -1, 0))) as fillet1_3_piece_5:
        with BuildLine():
            CenterArc((FILLET1_R, FILLET1_R), FILLET1_R, 180, 90)
            Line((0, FILLET1_R), (0, 0))
            Line((0, 0), (FILLET1_R, 0))
        make_face()
    extrude(amount=27, mode=Mode.SUBTRACT)
    with BuildSketch(Plane(origin=(18, 13.5, 0), x_dir=(-1, 0, 0), z_dir=(0, -1, 0))) as fillet1_3_piece_6:
        with BuildLine():
            CenterArc((FILLET1_R, -FILLET1_R), FILLET1_R, 90, 90)
            Line((0, -FILLET1_R), (0, 0))
            Line((0, 0), (FILLET1_R, 0))
        make_face()
    extrude(amount=27, mode=Mode.SUBTRACT)
    with BuildSketch(Plane(origin=(18, 14, -6), x_dir=(0, 1, 0), z_dir=(0, 0, 1))) as fillet1_3_piece_7:
        with BuildLine():
            CenterArc((FILLET1_R, FILLET1_R), FILLET1_R, 180, 90)
            Line((0, FILLET1_R), (0, 0))
            Line((0, 0), (FILLET1_R, 0))
        make_face()
    extrude(amount=5.5, mode=Mode.SUBTRACT)
    with BuildSketch(Plane(origin=(-18, 14, -6), x_dir=(0, 1, 0), z_dir=(0, 0, 1))) as fillet1_3_piece_8:
        with BuildLine():
            CenterArc((FILLET1_R, -FILLET1_R), FILLET1_R, 90, 90)
            Line((0, -FILLET1_R), (0, 0))
            Line((0, 0), (FILLET1_R, 0))
        make_face()
    extrude(amount=5.5, mode=Mode.SUBTRACT)
    with BuildSketch(Plane(origin=(-18, 13.5, -0.5), x_dir=(0, 0, 1), z_dir=(0, -1, 0))) as fillet1_3_piece_9:
        with BuildLine():
            CenterArc((0.5 + FILLET1_R, -FILLET1_R), FILLET1_R, 90, 90)
            Line((0.5 + FILLET1_R, 0), (0.5, 0))
            Line((0.5, 0), (0.5, -FILLET1_R))
        make_face()
    revolve(axis=Axis((-18, 13.5, -0.5), (-1, 0, 0)), revolution_arc=90, mode=Mode.SUBTRACT)
    with BuildSketch(Plane(origin=(18, 13.5, -0.5), x_dir=(0, 0, 1), z_dir=(0, -1, 0))) as fillet1_3_piece_10:
        with BuildLine():
            CenterArc((0.5 + FILLET1_R, FILLET1_R), FILLET1_R, 180, 90)
            Line((0.5 + FILLET1_R, 0), (0.5, 0))
            Line((0.5, 0), (0.5, FILLET1_R))
        make_face()
    revolve(axis=Axis((18, 13.5, -0.5), (-1, 0, 0)), revolution_arc=90, mode=Mode.SUBTRACT)

    # Fillet3
    fillet3_edges = [part.edges().sort_by_distance(p)[0] for p in [
        (5, -6.699489743, 4),
        (5, -6.699489743, 2.5),
        (0, -8.5, 2.5),
        (5, 6.699489743, 4),
        (5, 6.699489743, 2.5),
        (-5, 6.699489743, 4),
        (0, 8.5, 4),
        (0, 8.5, 2.5),
        (-5, 6.699489743, 2.5),
        (0, -8.5, 4),
        (-5, -6.699489743, 4),
        (-5, -6.699489743, 2.5),
    ]]
    fillet(fillet3_edges, radius=FILLET3_R - 0.0001)  # a hair under: the kernel refuses the full size


solid = part.part
